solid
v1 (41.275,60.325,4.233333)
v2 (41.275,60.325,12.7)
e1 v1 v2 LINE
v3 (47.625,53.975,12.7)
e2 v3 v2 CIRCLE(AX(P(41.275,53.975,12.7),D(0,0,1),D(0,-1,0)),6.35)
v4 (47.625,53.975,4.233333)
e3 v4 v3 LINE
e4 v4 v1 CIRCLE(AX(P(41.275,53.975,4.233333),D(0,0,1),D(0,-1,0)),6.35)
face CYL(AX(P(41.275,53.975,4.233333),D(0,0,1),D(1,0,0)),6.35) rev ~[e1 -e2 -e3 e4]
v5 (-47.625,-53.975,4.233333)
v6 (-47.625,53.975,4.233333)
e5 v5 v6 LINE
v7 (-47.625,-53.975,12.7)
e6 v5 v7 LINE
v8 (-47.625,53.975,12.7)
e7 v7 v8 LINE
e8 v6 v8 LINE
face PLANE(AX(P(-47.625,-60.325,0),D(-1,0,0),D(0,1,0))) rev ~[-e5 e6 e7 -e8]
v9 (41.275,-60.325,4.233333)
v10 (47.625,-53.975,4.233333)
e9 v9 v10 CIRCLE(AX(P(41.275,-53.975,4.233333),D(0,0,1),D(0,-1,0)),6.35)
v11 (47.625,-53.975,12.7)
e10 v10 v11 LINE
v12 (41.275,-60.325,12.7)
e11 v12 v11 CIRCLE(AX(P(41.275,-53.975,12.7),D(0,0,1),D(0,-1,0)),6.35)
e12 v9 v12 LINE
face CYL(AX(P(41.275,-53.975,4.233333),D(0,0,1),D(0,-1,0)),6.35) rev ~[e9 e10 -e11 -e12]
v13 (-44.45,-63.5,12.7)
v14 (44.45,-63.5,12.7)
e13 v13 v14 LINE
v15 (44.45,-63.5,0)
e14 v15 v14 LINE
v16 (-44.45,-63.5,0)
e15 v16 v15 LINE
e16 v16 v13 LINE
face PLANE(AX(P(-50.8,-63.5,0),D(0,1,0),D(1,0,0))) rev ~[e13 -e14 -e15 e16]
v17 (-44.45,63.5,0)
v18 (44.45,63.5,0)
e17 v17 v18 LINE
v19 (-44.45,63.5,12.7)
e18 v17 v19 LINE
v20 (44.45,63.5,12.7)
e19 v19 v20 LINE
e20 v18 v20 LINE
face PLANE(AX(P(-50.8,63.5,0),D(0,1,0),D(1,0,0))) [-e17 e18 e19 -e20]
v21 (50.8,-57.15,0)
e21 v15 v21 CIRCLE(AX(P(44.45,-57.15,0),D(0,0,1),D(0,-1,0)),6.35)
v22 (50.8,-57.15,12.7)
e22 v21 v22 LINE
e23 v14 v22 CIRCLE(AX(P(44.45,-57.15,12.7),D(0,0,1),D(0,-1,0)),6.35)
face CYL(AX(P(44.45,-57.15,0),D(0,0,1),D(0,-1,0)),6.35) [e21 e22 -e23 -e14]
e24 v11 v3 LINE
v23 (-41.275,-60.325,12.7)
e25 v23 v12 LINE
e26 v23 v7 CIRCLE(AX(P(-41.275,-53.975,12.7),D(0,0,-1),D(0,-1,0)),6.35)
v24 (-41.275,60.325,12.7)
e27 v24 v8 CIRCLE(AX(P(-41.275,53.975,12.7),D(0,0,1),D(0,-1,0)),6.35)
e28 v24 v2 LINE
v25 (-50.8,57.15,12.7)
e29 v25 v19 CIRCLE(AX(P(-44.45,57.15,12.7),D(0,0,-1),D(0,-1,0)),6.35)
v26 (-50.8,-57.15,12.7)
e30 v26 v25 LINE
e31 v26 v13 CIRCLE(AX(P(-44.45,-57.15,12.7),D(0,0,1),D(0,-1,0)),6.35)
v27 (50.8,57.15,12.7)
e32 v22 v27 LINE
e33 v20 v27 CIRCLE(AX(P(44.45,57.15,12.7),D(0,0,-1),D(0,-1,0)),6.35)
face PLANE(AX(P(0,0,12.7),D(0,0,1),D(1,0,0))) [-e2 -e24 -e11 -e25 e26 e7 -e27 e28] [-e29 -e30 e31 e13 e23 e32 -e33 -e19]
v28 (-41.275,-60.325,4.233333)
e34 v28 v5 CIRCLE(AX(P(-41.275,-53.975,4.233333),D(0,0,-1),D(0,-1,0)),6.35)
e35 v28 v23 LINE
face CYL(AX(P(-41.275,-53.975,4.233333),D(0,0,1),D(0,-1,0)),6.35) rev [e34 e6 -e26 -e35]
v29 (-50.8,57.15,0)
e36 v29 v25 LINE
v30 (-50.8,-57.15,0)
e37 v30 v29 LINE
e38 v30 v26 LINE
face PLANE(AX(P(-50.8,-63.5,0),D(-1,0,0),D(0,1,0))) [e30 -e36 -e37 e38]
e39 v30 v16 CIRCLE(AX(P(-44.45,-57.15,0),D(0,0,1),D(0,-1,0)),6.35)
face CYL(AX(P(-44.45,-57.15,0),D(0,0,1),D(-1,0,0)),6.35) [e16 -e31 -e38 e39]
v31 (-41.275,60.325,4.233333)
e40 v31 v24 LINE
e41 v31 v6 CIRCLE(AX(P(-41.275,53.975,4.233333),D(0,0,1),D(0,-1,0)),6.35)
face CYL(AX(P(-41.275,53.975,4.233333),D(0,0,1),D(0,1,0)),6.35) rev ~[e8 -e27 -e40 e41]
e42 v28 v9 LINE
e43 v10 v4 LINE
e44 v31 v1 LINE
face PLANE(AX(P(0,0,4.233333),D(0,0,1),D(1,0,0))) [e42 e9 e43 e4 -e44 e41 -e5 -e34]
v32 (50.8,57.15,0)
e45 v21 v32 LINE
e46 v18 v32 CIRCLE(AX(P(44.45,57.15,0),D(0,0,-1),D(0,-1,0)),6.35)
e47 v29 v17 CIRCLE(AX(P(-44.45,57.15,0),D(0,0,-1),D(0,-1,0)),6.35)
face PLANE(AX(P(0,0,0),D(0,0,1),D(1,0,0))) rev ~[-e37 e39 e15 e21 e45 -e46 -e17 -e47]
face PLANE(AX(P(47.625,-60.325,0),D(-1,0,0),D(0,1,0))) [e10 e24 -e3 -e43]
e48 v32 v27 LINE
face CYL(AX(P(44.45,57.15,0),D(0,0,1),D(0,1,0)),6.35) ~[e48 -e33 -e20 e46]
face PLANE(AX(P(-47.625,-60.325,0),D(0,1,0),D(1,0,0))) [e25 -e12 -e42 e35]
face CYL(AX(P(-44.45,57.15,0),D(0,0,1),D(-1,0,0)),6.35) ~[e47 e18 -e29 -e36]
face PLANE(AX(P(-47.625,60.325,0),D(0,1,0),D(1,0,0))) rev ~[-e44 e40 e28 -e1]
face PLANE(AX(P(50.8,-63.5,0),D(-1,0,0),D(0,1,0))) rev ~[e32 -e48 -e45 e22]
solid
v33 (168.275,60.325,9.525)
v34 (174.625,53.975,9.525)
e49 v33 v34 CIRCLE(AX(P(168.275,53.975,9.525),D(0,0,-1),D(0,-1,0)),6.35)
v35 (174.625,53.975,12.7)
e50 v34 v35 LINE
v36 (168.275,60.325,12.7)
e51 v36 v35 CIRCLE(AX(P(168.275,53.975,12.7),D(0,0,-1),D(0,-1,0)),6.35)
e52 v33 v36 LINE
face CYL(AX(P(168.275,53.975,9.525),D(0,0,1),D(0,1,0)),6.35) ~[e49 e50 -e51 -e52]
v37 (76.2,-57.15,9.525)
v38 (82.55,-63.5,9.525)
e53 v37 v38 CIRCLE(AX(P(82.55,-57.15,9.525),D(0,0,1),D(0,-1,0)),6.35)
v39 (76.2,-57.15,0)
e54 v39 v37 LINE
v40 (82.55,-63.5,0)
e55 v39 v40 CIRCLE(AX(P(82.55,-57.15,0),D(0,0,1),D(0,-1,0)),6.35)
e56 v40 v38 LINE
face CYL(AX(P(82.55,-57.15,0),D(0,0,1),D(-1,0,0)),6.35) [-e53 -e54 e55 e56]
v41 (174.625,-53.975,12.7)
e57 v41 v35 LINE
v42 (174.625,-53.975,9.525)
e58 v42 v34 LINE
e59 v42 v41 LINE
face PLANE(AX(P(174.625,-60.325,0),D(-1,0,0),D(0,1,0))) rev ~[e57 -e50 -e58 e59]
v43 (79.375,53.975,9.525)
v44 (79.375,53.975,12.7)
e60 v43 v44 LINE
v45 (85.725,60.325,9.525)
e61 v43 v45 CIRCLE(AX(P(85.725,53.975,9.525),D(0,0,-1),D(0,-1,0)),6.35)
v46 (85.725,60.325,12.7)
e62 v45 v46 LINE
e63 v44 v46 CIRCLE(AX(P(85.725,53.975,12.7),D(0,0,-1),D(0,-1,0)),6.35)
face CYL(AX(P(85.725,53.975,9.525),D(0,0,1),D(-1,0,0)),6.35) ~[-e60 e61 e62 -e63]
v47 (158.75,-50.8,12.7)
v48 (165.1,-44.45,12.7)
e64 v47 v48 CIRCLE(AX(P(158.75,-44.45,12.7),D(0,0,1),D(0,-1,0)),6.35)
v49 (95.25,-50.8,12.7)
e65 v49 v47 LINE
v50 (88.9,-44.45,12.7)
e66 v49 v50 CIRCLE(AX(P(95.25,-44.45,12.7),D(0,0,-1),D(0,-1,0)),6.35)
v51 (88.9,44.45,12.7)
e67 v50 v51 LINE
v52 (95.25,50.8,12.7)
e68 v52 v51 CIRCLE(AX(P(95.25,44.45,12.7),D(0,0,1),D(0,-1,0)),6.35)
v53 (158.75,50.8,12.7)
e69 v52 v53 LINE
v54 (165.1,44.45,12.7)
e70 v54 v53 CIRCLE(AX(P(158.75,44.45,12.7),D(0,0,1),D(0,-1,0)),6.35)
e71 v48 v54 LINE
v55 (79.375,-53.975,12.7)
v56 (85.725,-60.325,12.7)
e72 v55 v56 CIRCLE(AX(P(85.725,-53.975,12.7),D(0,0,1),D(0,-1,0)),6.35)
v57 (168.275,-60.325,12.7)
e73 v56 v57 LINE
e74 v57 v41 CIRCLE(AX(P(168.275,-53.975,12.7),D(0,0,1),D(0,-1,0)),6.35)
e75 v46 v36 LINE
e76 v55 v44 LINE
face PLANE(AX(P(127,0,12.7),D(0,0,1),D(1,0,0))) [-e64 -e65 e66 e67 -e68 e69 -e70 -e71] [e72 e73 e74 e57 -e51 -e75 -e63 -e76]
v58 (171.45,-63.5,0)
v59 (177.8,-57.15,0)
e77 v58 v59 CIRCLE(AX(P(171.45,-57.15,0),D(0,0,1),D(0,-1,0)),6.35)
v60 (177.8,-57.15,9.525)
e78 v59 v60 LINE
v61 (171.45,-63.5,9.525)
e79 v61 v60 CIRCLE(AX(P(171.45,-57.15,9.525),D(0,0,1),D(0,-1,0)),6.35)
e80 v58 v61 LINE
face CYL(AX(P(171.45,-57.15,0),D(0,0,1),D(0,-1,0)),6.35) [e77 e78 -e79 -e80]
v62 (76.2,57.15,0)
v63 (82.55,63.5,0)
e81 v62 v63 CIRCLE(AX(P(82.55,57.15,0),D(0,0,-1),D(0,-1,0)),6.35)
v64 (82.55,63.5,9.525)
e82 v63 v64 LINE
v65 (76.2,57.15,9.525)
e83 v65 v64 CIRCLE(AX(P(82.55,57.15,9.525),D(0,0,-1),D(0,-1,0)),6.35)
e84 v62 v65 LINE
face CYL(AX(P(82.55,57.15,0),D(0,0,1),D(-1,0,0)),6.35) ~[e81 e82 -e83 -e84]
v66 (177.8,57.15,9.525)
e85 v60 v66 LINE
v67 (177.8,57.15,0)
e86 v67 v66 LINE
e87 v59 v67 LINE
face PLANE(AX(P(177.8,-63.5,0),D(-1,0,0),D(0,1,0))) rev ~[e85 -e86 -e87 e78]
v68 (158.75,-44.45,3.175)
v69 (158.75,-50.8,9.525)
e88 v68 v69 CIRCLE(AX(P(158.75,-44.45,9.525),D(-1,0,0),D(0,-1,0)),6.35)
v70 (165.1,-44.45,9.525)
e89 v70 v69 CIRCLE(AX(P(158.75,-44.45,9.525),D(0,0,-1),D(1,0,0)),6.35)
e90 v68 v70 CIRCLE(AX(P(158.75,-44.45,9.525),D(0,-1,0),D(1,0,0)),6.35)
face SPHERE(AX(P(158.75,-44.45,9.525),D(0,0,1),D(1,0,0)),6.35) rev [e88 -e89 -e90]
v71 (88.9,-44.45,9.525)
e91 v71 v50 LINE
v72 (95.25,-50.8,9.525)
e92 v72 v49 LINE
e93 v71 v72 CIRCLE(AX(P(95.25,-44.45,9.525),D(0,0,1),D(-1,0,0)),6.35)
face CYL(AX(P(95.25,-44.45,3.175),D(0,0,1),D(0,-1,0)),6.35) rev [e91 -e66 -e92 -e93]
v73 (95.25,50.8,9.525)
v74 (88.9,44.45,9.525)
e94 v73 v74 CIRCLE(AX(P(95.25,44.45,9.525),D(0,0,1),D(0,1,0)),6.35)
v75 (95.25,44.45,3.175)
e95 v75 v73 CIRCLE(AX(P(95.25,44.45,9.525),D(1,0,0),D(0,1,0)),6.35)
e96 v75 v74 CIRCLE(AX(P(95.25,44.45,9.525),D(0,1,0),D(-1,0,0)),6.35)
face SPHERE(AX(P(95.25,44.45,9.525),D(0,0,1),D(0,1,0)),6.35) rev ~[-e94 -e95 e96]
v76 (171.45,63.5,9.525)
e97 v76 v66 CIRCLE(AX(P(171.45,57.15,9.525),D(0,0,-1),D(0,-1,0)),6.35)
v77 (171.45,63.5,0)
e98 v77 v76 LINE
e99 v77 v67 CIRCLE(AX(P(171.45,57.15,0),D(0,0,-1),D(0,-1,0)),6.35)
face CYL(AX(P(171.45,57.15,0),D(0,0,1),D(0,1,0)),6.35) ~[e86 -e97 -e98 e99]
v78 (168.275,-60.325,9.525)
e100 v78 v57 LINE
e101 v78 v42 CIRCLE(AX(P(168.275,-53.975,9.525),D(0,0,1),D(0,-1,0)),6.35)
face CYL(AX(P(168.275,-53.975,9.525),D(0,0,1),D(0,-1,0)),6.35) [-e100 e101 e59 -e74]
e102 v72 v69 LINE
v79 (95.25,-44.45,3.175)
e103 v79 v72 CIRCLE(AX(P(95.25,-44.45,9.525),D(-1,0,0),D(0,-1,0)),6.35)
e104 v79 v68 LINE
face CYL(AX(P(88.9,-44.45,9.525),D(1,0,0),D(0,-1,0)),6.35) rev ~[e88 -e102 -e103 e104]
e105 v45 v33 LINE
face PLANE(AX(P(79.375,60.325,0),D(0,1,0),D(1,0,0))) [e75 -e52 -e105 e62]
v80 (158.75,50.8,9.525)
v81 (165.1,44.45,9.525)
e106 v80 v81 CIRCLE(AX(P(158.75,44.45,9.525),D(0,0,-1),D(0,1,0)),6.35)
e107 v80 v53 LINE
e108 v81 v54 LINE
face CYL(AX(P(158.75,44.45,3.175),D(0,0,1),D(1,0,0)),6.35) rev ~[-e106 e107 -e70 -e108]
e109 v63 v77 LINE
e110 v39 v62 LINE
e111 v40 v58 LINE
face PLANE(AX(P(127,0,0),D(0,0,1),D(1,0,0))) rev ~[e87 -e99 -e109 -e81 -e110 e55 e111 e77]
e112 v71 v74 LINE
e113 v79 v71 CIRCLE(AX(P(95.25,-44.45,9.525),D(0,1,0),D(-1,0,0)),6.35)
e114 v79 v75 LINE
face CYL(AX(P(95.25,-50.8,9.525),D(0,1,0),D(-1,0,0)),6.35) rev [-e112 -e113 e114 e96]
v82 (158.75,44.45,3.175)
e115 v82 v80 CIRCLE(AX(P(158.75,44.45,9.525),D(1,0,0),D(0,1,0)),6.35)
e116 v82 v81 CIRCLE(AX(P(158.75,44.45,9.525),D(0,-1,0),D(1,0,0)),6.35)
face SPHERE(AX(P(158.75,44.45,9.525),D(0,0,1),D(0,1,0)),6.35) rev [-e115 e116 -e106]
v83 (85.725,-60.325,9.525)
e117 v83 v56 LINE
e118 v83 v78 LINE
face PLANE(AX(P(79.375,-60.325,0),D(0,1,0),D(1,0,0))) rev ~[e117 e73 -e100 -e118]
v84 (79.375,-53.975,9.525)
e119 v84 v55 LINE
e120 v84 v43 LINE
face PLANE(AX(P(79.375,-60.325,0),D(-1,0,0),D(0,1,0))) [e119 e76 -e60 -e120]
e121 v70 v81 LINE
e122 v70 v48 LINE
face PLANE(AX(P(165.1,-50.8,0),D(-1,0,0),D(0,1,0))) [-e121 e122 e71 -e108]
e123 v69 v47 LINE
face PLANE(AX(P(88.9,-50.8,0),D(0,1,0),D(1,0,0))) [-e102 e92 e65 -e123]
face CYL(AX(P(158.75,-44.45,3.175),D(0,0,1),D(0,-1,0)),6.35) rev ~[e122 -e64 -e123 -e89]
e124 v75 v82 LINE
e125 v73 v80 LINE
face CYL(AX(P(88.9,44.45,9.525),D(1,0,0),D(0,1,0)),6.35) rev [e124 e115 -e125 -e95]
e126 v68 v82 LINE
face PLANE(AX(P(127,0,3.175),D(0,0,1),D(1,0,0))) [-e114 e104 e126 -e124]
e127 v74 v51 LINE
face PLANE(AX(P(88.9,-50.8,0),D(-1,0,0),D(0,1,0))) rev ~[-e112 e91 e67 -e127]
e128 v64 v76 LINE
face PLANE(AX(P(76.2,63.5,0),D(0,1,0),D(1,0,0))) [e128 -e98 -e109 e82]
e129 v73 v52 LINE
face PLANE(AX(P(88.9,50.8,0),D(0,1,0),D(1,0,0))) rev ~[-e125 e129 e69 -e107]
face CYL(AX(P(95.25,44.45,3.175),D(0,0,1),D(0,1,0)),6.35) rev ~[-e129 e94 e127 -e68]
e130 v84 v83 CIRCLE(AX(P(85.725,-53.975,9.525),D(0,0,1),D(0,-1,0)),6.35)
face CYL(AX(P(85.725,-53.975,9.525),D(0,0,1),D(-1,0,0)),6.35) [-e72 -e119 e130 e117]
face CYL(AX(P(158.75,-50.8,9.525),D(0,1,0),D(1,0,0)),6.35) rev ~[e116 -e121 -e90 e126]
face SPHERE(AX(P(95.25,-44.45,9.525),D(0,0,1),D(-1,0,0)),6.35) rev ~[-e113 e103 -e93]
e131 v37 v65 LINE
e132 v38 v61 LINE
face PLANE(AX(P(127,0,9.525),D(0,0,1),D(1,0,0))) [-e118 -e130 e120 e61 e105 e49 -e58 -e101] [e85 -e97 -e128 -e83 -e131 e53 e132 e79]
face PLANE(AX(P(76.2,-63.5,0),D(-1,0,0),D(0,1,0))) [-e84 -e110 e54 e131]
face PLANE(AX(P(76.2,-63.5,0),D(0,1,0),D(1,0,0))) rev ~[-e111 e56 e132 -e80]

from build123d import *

# Parameters (mm, degrees)
F2_W     = 101.6
F2_H     = 127
F2_W_2   = 95.25
F2_H_2   = 120.65
F3_DEPTH = 9.525
F2_W_3   = 76.2
F2_H_3   = 101.6
F4_DEPTH = 3.175
F5_DEPTH = 12.7
F7_DEPTH = 4.2333333333
F8_DEPTH = 12.7
F10_R    = 6.35
F11_R    = 6.35


# Not quite as in the source:
# - a variable given as a bare number and used for a length is read in inches; the dataset says mm whatever the document's units were


with BuildPart() as f3:
    # F2 (on Top) → F3 (new body)
    with BuildSketch(Plane.XY):
        Rectangle(F2_W, F2_H)
        Rectangle(F2_W_2, F2_H_2, mode=Mode.SUBTRACT)
    extrude(amount=F3_DEPTH)



with BuildPart() as f4:
    # F2 (on Top) → F4 (new body)
    with BuildSketch(Plane.XY):
        Rectangle(F2_W_3, F2_H_3)
    extrude(amount=F4_DEPTH)


with BuildPart() as f3_1:
    add(f3.part)

    add(f4.part)  # F5 merges F4
    # F2 (on Top) → F5 (join)
    with BuildSketch(Plane.XY):
        Rectangle(F2_W_2, F2_H_2)
        Rectangle(F2_W_3, F2_H_3, mode=Mode.SUBTRACT)
    extrude(amount=F5_DEPTH)


with BuildPart() as f3_2:
    # F6: moved
    add(f3_1.part.moved(Location((127, 0, 0))))

    # F10
    f10_edges = [f3_2.edges().sort_by_distance(p)[0] for p in [
        (177.8, -63.5, 4.7625),
        (174.625, -60.325, 11.1125),
        (165.1, -50.8, 7.9375),
        (76.2, -63.5, 4.7625),
        (79.375, -60.325, 11.1125),
        (88.9, -50.8, 7.9375),
        (76.2, 63.5, 4.7625),
        (79.375, 60.325, 11.1125),
        (88.9, 50.8, 7.9375),
        (177.8, 63.5, 4.7625),
        (174.625, 60.325, 11.1125),
        (165.1, 50.8, 7.9375),
        (127, 50.8, 3.175),
        (165.1, 0, 3.175),
        (88.9, 0, 3.175),
        (127, -50.8, 3.175),
    ]]
    fillet(f10_edges, radius=F10_R)


with BuildPart() as f7:
    # F2 (on Top) → F7 (new body)
    with BuildSketch(Plane.XY):
        Rectangle(F2_W_2, F2_H_2)
        Rectangle(F2_W_3, F2_H_3, mode=Mode.SUBTRACT)
        Rectangle(F2_W_3, F2_H_3)
    extrude(amount=F7_DEPTH)

    # F2 (on Top) → F8 (join)
    with BuildSketch(Plane.XY):
        Rectangle(F2_W, F2_H)
        Rectangle(F2_W_2, F2_H_2, mode=Mode.SUBTRACT)
    extrude(amount=F8_DEPTH)

    # F11
    f11_edges = [f7.edges().sort_by_distance(p)[0] for p in [
        (50.8, 63.5, 6.35),
        (47.625, 60.325, 8.466667),
        (-50.8, 63.5, 6.35),
        (-47.625, 60.325, 8.466667),
        (-50.8, -63.5, 6.35),
        (-47.625, -60.325, 8.466667),
        (47.625, -60.325, 8.466667),
        (50.8, -63.5, 6.35),
    ]]
    fillet(f11_edges, radius=F11_R)


solid = Compound([f3_2.part, f7.part])
